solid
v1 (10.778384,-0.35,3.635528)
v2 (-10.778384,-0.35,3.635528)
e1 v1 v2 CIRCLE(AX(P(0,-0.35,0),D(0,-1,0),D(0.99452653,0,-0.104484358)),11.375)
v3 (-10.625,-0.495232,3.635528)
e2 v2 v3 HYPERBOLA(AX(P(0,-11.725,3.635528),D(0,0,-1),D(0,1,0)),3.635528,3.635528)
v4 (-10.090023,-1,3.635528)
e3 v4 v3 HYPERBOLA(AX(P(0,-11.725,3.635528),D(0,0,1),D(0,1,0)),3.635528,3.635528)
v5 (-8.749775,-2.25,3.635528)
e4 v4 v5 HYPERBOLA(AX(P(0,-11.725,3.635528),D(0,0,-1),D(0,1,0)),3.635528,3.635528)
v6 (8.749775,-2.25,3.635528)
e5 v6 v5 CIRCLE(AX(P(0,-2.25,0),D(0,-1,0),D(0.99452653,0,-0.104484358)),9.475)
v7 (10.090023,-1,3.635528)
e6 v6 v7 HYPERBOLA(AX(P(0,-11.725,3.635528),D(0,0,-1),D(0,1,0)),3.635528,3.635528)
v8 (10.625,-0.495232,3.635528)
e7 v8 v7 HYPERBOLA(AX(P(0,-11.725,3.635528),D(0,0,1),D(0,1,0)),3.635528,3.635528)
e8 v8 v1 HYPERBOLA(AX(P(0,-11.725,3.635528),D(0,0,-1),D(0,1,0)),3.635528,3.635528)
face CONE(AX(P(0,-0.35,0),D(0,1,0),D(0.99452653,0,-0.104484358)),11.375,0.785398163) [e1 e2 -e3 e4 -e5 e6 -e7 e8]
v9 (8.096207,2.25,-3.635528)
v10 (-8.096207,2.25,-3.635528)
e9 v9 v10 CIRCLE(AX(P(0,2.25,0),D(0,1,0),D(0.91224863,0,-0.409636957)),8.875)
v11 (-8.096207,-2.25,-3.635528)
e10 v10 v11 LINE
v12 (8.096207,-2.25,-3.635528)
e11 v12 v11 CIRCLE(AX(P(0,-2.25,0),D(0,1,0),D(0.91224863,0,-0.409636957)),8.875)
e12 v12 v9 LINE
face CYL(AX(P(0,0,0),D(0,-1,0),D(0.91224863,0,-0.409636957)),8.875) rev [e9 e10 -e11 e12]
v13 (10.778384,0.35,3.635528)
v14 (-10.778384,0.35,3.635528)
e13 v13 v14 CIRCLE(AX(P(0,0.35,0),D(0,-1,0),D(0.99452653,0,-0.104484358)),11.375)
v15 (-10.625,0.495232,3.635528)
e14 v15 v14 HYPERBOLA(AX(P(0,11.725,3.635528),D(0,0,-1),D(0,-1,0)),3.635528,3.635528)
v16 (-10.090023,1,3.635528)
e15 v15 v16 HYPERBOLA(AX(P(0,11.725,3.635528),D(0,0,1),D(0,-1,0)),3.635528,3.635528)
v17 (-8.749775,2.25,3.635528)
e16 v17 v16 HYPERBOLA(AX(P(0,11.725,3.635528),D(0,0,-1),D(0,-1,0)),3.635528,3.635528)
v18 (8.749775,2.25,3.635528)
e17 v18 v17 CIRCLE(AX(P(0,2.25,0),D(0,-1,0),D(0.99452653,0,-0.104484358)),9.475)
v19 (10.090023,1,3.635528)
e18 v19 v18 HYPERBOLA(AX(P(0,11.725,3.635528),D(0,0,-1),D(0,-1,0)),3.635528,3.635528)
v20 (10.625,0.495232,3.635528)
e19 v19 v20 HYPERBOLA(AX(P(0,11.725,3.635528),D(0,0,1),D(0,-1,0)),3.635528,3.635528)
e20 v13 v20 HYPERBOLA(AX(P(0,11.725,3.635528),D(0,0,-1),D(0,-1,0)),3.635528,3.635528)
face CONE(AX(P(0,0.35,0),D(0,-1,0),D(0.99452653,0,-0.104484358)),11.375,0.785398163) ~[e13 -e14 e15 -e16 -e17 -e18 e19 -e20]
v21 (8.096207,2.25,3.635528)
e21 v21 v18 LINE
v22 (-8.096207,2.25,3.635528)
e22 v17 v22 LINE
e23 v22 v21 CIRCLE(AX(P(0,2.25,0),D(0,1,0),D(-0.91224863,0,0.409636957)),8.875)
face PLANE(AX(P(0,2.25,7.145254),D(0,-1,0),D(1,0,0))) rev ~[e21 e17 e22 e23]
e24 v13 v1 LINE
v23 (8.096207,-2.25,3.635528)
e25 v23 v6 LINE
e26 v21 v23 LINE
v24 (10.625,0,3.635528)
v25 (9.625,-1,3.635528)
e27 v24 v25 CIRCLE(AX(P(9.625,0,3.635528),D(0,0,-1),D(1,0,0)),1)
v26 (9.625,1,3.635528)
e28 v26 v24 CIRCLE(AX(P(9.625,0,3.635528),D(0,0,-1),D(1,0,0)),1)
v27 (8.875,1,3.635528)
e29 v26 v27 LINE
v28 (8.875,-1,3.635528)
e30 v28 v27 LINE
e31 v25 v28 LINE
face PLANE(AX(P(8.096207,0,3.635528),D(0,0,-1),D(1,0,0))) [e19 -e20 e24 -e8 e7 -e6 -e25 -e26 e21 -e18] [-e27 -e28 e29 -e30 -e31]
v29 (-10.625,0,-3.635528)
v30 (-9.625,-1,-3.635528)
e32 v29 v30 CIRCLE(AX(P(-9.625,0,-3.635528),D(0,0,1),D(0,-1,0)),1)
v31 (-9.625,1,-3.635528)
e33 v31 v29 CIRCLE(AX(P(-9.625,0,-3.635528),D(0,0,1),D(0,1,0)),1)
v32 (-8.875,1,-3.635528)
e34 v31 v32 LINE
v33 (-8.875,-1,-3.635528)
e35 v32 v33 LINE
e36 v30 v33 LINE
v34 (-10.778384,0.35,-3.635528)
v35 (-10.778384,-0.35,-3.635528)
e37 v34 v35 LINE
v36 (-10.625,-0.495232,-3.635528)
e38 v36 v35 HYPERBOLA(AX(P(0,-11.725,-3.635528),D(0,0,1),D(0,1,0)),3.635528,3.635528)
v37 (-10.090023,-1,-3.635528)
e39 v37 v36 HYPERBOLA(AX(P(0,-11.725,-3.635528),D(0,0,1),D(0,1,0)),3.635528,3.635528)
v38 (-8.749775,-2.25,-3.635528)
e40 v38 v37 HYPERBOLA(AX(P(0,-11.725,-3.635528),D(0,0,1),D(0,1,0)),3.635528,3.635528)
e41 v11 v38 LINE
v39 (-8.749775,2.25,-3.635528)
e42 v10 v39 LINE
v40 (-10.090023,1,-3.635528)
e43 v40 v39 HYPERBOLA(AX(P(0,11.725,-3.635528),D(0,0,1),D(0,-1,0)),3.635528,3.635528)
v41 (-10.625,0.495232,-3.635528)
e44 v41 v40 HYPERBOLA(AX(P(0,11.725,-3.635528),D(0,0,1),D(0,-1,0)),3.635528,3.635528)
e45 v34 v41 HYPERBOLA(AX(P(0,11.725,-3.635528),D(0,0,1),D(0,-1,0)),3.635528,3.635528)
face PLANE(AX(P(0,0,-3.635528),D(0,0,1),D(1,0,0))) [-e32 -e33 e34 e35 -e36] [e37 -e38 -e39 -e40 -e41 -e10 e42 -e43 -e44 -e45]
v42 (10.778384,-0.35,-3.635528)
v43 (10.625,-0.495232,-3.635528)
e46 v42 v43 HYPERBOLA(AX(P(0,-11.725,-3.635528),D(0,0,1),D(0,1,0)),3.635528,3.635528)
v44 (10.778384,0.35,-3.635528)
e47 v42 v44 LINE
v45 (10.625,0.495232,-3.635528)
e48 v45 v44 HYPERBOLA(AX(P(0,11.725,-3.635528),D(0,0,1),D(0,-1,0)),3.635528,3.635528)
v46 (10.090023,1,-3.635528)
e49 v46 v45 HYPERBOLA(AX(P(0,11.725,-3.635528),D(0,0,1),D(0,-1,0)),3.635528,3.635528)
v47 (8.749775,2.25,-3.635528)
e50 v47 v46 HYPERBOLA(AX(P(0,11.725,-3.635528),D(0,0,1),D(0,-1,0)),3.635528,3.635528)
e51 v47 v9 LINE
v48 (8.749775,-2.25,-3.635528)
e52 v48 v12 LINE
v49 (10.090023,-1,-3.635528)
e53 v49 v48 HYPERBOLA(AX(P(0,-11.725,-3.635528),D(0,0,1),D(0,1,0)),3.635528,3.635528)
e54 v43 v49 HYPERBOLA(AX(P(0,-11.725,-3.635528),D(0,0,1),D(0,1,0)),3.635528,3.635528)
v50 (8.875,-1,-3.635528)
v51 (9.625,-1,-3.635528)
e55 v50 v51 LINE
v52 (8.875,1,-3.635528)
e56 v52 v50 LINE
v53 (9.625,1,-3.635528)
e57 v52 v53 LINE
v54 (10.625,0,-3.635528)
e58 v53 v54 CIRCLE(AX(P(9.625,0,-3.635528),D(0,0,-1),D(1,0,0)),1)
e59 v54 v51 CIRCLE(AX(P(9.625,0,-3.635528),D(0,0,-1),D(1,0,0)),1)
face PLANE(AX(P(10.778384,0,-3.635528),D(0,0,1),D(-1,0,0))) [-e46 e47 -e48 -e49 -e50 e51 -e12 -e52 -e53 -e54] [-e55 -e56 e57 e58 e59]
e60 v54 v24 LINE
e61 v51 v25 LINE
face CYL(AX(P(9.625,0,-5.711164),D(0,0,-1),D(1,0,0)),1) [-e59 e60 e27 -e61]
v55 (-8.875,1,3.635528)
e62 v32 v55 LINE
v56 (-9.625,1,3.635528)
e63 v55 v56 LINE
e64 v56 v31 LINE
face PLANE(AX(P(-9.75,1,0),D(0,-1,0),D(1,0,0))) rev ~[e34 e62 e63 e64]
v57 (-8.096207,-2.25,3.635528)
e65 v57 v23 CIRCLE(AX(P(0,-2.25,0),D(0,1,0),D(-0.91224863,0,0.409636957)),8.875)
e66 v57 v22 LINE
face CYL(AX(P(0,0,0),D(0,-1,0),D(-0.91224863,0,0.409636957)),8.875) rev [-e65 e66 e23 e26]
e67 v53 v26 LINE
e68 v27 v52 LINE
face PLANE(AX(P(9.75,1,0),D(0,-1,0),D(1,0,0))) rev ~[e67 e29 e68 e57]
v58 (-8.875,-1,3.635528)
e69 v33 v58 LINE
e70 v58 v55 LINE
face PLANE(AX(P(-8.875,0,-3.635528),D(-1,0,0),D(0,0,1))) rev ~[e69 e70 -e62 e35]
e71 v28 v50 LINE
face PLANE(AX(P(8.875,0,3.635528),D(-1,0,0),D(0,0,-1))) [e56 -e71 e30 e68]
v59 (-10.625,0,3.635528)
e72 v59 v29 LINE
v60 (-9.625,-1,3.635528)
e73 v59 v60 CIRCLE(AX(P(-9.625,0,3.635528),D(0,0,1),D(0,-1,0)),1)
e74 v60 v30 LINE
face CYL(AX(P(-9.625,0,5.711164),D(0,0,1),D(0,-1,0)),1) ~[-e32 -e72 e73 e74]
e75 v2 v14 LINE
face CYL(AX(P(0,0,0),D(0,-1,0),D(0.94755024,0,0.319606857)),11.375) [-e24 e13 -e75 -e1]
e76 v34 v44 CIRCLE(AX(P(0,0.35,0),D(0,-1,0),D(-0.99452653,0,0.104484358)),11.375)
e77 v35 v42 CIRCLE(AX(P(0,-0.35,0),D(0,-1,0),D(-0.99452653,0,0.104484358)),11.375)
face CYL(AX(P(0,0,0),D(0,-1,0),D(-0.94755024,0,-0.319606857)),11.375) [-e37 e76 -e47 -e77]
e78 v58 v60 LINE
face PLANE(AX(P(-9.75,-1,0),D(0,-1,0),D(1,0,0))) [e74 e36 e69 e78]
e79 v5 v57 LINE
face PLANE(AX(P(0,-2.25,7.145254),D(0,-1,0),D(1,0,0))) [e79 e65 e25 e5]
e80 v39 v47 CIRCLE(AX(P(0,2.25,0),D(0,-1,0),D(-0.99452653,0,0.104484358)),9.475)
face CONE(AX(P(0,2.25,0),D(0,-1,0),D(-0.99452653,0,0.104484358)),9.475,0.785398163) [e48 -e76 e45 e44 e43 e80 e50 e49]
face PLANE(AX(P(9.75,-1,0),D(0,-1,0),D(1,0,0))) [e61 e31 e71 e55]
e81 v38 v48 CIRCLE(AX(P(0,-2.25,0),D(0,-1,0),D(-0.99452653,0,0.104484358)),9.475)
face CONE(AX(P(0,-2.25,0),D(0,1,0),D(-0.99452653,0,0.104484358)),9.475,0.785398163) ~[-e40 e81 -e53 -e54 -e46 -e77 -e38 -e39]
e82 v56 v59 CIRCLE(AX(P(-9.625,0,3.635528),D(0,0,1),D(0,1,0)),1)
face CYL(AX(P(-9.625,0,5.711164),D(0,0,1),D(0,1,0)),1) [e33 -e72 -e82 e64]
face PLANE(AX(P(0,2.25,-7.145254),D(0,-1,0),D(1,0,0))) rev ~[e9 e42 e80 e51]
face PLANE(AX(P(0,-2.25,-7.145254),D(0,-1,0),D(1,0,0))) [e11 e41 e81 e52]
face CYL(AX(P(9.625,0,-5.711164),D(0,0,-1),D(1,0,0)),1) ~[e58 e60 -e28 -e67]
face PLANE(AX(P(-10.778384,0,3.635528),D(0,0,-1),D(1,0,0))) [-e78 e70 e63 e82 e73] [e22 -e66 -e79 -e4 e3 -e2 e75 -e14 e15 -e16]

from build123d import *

# Parameters (mm, degrees)
F1_DEPTH      = 2.25
F1_DEPTH_BACK = 2.25
F2_DEPTH      = 1
F2_DEPTH_BACK = 1
F3_T2_ANGLE   = 191.9949180636
F3_T4_ANGLE   = 191.9949180636
F3_T6_ANGLE   = 191.9949180636
F3_T8_ANGLE   = 191.9949180636
F4_T4_DEPTH   = 11.4223278392
F4_T10_DEPTH  = 11.4223278392
F4_T16_DEPTH  = 11.4223278392
F4_T22_DEPTH  = 11.4223278392


# Not quite as in the source:
# - a fillet or chamfer that OpenCascade refuses, or shapes differently, is made with other operations: its cross-section is extruded or revolved along the edge and cut away or added


with BuildPart() as f1:
    # F0 (on Front) → F1 (new body, two sides)
    with BuildSketch(Plane.XZ) as f1_sk:
        with BuildLine():
            ThreePointArc((-8.0962065927, 3.6355279959), (0, 8.875), (8.0962065927, 3.6355279959))
            Line((8.0962065927, 3.6355279959), (8.875, 3.6355279959))
            Line((8.875, 3.6355279959), (10.625, 3.6355279959))
            Line((10.625, 3.6355279959), (10.7783839786, 3.6355279959))
            ThreePointArc((10.7783839786, 3.6355279959), (0, 11.375), (-10.7783839786, 3.6355279959))
            Line((-10.7783839786, 3.6355279959), (-10.625, 3.6355279959))
            Line((-10.625, 3.6355279959), (-8.875, 3.6355279959))
            Line((-8.875, 3.6355279959), (-8.0962065927, 3.6355279959))
        make_face()
    extrude(amount=F1_DEPTH)
    extrude(f1_sk.sketch, amount=-F1_DEPTH_BACK)



with BuildPart() as f1b:
    # F0 (on Front) → F1, piece 2 (new body, two sides)
    with BuildSketch(Plane.XZ) as f1_2_sk:
        with BuildLine():
            Line((8.875, -3.6355279959), (8.0962065927, -3.6355279959))
            ThreePointArc((8.0962065927, -3.6355279959), (0, -8.875), (-8.0962065927, -3.6355279959))
            Line((-8.0962065927, -3.6355279959), (-8.875, -3.6355279959))
            Line((-8.875, -3.6355279959), (-10.625, -3.6355279959))
            Line((-10.625, -3.6355279959), (-10.7783839786, -3.6355279959))
            ThreePointArc((-10.7783839786, -3.6355279959), (0, -11.375), (10.7783839786, -3.6355279959))
            Line((10.7783839786, -3.6355279959), (10.625, -3.6355279959))
            Line((10.625, -3.6355279959), (8.875, -3.6355279959))
        make_face()
    extrude(amount=F1_DEPTH)
    extrude(f1_2_sk.sketch, amount=-F1_DEPTH_BACK)


with BuildPart() as f1_1:
    add(f1.part)

    add(f1b.part)  # F2 merges F1b
    # F0 (on Front) → F2 (join, two sides)
    with BuildSketch(Plane.XZ) as f2_sk:
        Polygon((8.875, 3.6355279959), (8.875, 0), (8.875, -3.6355279959), (10.625, -3.6355279959), (10.625, 3.6355279959), align=None)
        Polygon((-8.875, -3.6355279959), (-8.875, 0), (-8.875, 3.6355279959), (-10.625, 3.6355279959), (-10.625, -3.6355279959), align=None)
    extrude(amount=F2_DEPTH)
    extrude(f2_sk.sketch, amount=-F2_DEPTH_BACK)

    # F3: chamfer of 1.9 on 4 edges, made by hand

    # F3_s1 → F3_t2 (revolve, cut)
    with BuildSketch(Plane(origin=(0, 0, 0), x_dir=(0, 1, 0), z_dir=(-0.1044843578, 0, -0.99452653))):
        Polygon((0.35, 11.375), (2.25, 9.475), (2.25, 11.375), align=None)
    revolve(axis=Axis((0, 2.25, 0), (0, -1, 0)), revolution_arc=F3_T2_ANGLE, mode=Mode.SUBTRACT)

    # F3_s3 → F3_t4 (revolve, cut)
    with BuildSketch(Plane(origin=(0, 0, 0), x_dir=(0, 1, 0), z_dir=(0.1044843578, 0, 0.99452653))):
        Polygon((2.25, 9.475), (0.35, 11.375), (2.25, 11.375), align=None)
    revolve(axis=Axis((0, 2.25, 0), (0, -1, 0)), revolution_arc=F3_T4_ANGLE, mode=Mode.SUBTRACT)

    # F3_s5 → F3_t6 (revolve, cut)
    with BuildSketch(Plane(origin=(0, 0, 0), x_dir=(0, 1, 0), z_dir=(-0.1044843578, 0, -0.99452653))):
        Polygon((-0.35, 11.375), (-2.25, 9.475), (-2.25, 11.375), align=None)
    revolve(axis=Axis((0, -2.25, 0), (0, -1, 0)), revolution_arc=F3_T6_ANGLE, mode=Mode.SUBTRACT)

    # F3_s7 → F3_t8 (revolve, cut)
    with BuildSketch(Plane(origin=(0, 0, 0), x_dir=(0, 1, 0), z_dir=(0.1044843578, 0, 0.99452653))):
        Polygon((-2.25, 9.475), (-0.35, 11.375), (-2.25, 11.375), align=None)
    revolve(axis=Axis((0, -2.25, 0), (0, -1, 0)), revolution_arc=F3_T8_ANGLE, mode=Mode.SUBTRACT)

    # F4: fillet of radius 1 on 4 edges, made by hand


with BuildPart() as f4_tool2:
    # F4_s3 → F4_t4 (new body)
    with BuildSketch(Plane.XY.offset(-5.7111639196)):
        with BuildLine():
            ThreePointArc((10.625, 0), (10.3321067812, -0.7071067812), (9.625, -1))
            Line((9.625, -1), (10.625, -1))
            Line((10.625, -1), (10.625, 0))
        make_face()
    extrude(amount=F4_T4_DEPTH)

    split(bisect_by=Plane.XY.offset(-3.6355279959), keep=Keep.TOP)

    split(bisect_by=Plane.XY.offset(3.6355279959), keep=Keep.BOTTOM)


with BuildPart() as f1_2:
    add(f1_1.part)

    # F4_t1: cut F4_tool2
    add(f4_tool2.part, mode=Mode.SUBTRACT)


with BuildPart() as f4_tool8:
    # F4_s9 → F4_t10 (new body)
    with BuildSketch(Plane.XY.offset(-5.7111639196)):
        with BuildLine():
            ThreePointArc((10.625, 0), (10.3321067812, 0.7071067812), (9.625, 1))
            Line((9.625, 1), (10.625, 1))
            Line((10.625, 1), (10.625, 0))
        make_face()
    extrude(amount=F4_T10_DEPTH)

    split(bisect_by=Plane.XY.offset(-3.6355279959), keep=Keep.TOP)

    split(bisect_by=Plane.XY.offset(3.6355279959), keep=Keep.BOTTOM)


with BuildPart() as f1_3:
    add(f1_2.part)

    # F4_t7: cut F4_tool8
    add(f4_tool8.part, mode=Mode.SUBTRACT)


with BuildPart() as f4_tool14:
    # F4_s15 → F4_t16 (new body)
    with BuildSketch(Plane.XY.offset(5.7111639196)):
        with BuildLine():
            ThreePointArc((-9.625, 1), (-10.3321067812, 0.7071067812), (-10.625, 0))
            Line((-10.625, 0), (-10.625, 1))
            Line((-10.625, 1), (-9.625, 1))
        make_face()
    extrude(amount=-F4_T16_DEPTH)

    split(bisect_by=Plane.XY.offset(-3.6355279959), keep=Keep.TOP)

    split(bisect_by=Plane.XY.offset(3.6355279959), keep=Keep.BOTTOM)


with BuildPart() as f1_4:
    add(f1_3.part)

    # F4_t13: cut F4_tool14
    add(f4_tool14.part, mode=Mode.SUBTRACT)


with BuildPart() as f4_tool20:
    # F4_s21 → F4_t22 (new body)
    with BuildSketch(Plane.XY.offset(5.7111639196)):
        with BuildLine():
            ThreePointArc((-9.625, -1), (-10.3321067812, -0.7071067812), (-10.625, 0))
            Line((-10.625, 0), (-10.625, -1))
            Line((-10.625, -1), (-9.625, -1))
        make_face()
    extrude(amount=-F4_T22_DEPTH)

    split(bisect_by=Plane.XY.offset(-3.6355279959), keep=Keep.TOP)

    split(bisect_by=Plane.XY.offset(3.6355279959), keep=Keep.BOTTOM)


with BuildPart() as f1_5:
    add(f1_4.part)

    # F4_t19: cut F4_tool20
    add(f4_tool20.part, mode=Mode.SUBTRACT)


solid = f1_5.part
